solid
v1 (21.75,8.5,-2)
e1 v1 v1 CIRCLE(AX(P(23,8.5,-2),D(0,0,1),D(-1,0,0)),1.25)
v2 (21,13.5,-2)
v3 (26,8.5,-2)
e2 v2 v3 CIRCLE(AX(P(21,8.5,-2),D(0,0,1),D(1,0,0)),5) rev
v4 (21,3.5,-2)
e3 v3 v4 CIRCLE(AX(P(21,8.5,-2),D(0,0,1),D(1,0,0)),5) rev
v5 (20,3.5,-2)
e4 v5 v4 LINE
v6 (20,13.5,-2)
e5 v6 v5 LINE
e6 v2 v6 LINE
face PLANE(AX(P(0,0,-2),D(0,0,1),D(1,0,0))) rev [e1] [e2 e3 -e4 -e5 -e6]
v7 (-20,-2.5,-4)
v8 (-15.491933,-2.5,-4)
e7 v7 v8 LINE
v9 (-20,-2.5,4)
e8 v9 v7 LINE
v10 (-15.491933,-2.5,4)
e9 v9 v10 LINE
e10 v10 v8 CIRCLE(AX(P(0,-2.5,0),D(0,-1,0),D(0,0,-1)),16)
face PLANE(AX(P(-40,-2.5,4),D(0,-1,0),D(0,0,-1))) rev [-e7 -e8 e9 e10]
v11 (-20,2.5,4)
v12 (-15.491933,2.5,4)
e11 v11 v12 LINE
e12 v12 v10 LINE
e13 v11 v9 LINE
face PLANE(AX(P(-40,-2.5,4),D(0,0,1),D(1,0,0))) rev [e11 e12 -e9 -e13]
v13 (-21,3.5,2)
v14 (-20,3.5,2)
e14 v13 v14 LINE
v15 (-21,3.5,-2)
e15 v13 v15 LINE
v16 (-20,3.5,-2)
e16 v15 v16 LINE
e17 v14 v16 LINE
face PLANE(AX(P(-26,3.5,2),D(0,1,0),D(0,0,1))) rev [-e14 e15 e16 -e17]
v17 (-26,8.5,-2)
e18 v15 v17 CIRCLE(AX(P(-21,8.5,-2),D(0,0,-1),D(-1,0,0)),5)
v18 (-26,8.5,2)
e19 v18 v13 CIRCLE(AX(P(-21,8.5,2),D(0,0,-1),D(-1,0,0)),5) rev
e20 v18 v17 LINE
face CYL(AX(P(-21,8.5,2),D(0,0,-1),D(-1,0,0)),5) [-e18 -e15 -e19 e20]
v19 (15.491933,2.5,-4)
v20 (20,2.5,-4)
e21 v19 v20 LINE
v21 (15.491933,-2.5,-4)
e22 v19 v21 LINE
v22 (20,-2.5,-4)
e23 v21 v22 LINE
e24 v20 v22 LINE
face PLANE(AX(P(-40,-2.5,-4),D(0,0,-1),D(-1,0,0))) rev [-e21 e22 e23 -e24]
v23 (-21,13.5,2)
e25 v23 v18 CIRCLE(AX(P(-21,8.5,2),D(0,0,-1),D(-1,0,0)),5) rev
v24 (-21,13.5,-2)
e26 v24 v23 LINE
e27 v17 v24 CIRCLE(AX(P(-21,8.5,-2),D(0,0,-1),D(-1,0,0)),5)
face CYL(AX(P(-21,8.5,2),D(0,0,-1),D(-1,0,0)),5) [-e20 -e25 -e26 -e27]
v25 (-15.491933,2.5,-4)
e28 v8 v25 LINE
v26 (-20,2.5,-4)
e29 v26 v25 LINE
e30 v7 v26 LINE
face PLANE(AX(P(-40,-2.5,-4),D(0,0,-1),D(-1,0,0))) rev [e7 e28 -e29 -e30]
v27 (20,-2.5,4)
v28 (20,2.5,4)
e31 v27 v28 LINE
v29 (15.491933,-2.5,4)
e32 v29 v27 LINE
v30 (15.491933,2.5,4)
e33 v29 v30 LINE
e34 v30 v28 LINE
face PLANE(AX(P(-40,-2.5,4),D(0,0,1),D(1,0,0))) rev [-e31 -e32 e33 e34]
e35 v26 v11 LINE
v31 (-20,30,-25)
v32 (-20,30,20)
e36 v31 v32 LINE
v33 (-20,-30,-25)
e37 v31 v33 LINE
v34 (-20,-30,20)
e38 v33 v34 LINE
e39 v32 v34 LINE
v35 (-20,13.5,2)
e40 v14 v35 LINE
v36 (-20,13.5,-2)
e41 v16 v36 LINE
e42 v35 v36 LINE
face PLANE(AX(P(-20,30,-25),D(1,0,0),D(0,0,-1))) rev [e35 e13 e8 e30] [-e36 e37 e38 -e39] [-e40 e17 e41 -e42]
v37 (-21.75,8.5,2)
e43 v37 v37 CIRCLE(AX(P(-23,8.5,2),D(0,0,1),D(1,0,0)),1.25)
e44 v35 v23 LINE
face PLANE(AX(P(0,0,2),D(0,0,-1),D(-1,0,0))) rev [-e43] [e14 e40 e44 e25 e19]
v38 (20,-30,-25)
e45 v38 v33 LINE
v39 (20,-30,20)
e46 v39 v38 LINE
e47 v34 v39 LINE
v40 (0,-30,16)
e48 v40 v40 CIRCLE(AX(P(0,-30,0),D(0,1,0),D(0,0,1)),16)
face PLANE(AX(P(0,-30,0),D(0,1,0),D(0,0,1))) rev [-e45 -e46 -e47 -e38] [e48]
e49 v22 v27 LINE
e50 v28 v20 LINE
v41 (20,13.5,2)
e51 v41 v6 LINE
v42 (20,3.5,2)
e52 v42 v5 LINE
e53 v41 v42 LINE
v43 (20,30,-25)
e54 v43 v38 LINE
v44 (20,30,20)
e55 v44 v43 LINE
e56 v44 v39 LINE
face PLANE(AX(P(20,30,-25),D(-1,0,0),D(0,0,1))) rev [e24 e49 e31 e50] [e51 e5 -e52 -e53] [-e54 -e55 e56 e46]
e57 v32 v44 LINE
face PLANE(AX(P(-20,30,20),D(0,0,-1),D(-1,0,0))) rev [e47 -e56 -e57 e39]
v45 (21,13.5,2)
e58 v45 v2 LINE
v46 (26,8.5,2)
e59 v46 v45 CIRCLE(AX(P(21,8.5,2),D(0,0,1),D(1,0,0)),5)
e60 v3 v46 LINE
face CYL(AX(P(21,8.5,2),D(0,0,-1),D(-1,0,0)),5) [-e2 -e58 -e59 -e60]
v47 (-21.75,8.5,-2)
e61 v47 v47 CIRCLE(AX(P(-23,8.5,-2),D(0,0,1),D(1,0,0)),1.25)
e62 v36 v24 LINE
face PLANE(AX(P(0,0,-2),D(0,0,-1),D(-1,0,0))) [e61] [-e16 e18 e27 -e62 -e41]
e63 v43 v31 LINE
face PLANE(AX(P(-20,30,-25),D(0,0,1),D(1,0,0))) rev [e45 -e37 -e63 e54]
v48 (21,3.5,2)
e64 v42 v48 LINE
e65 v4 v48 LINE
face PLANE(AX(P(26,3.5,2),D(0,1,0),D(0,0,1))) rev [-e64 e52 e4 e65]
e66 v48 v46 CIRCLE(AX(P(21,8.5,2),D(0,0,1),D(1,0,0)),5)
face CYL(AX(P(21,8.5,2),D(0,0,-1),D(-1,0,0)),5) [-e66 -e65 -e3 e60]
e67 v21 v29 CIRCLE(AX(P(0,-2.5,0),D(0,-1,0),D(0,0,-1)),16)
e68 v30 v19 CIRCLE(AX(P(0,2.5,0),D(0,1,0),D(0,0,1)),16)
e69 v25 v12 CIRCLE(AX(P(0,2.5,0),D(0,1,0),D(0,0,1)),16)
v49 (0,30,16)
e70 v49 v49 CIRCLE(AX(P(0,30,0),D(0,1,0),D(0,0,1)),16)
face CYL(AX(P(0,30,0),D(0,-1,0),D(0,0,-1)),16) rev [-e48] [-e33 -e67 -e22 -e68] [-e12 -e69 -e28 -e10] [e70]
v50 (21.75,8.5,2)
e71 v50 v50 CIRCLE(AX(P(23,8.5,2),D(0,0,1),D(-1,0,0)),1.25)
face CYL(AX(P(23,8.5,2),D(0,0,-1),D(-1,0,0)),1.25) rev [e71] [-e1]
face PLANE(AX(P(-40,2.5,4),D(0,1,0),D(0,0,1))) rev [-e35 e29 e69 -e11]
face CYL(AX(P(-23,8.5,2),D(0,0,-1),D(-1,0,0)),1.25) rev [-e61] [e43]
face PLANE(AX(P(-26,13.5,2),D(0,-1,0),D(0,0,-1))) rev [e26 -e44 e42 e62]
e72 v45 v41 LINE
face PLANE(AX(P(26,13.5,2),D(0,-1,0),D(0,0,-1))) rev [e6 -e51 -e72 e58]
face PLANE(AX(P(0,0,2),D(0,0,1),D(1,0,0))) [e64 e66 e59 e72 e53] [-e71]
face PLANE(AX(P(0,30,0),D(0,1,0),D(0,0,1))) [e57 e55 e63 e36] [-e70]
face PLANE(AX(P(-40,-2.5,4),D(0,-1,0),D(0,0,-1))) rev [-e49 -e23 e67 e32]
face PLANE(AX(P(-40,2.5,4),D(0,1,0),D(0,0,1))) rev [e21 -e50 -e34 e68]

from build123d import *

# Parameters (mm, degrees)
CROQUIS1_W              = 40
CROQUIS1_H              = 45
CROQUIS1_R              = 16
SALIENTE_EXTRUIR1_DEPTH = 30
CROQUIS3_W              = 8
CROQUIS3_H              = 5
CORTAR_EXTRUIR1_DEPTH   = 40
CROQUIS4_W              = 6
CROQUIS4_H              = 10
CROQUIS4_R              = 1.25
SALIENTE_EXTRUIR2_DEPTH = 2
REDONDEO1_R             = 5


with BuildPart() as part:
    # Croquis1 → Saliente-Extruir1 (new, symmetric)
    with BuildSketch(Plane(origin=(0, 0, 0), x_dir=(1, 0, 0), z_dir=(0, 1, 0))):
        with Locations((0, 2.5)):
            Rectangle(CROQUIS1_W, CROQUIS1_H)
        with Locations(Location((0, 0, 0), (0, 0, 90))):
            Circle(CROQUIS1_R, mode=Mode.SUBTRACT)
    extrude(amount=SALIENTE_EXTRUIR1_DEPTH, both=True)

    # Croquis3 → Cortar-Extruir1 (cut, symmetric)
    with BuildSketch(Plane(origin=(0, 0, 0), x_dir=(0, 0, -1), z_dir=(1, 0, 0))):
        Rectangle(CROQUIS3_W, CROQUIS3_H)
    extrude(amount=CORTAR_EXTRUIR1_DEPTH, both=True, mode=Mode.SUBTRACT)

    # Croquis4 → Saliente-Extruir2 (add, symmetric)
    # profile 1 of 2: a face of its own
    with BuildSketch(Plane.XY):
        with Locations((-23, 8.5)):
            Rectangle(CROQUIS4_W, CROQUIS4_H)
        with Locations((-23, 8.5)):
            Circle(CROQUIS4_R, mode=Mode.SUBTRACT)
    # profile 2 of 2: a face of its own
    with BuildSketch(Plane.XY):
        with Locations((23, 8.5)):
            Rectangle(CROQUIS4_W, CROQUIS4_H)
        with Locations(Location((23, 8.5, 0), (0, 0, 180))):
            Circle(CROQUIS4_R, mode=Mode.SUBTRACT)
    extrude(amount=SALIENTE_EXTRUIR2_DEPTH, both=True)

    # Redondeo1
    redondeo1_edges = [part.edges().sort_by_distance(p)[0] for p in [
        (26, 3.5, 0),
        (26, 13.5, 0),
        (-26, 3.5, 0),
        (-26, 13.5, 0),
    ]]
    fillet(redondeo1_edges, radius=REDONDEO1_R - 0.0001)  # a hair under: the kernel refuses the full size


solid = part.part
